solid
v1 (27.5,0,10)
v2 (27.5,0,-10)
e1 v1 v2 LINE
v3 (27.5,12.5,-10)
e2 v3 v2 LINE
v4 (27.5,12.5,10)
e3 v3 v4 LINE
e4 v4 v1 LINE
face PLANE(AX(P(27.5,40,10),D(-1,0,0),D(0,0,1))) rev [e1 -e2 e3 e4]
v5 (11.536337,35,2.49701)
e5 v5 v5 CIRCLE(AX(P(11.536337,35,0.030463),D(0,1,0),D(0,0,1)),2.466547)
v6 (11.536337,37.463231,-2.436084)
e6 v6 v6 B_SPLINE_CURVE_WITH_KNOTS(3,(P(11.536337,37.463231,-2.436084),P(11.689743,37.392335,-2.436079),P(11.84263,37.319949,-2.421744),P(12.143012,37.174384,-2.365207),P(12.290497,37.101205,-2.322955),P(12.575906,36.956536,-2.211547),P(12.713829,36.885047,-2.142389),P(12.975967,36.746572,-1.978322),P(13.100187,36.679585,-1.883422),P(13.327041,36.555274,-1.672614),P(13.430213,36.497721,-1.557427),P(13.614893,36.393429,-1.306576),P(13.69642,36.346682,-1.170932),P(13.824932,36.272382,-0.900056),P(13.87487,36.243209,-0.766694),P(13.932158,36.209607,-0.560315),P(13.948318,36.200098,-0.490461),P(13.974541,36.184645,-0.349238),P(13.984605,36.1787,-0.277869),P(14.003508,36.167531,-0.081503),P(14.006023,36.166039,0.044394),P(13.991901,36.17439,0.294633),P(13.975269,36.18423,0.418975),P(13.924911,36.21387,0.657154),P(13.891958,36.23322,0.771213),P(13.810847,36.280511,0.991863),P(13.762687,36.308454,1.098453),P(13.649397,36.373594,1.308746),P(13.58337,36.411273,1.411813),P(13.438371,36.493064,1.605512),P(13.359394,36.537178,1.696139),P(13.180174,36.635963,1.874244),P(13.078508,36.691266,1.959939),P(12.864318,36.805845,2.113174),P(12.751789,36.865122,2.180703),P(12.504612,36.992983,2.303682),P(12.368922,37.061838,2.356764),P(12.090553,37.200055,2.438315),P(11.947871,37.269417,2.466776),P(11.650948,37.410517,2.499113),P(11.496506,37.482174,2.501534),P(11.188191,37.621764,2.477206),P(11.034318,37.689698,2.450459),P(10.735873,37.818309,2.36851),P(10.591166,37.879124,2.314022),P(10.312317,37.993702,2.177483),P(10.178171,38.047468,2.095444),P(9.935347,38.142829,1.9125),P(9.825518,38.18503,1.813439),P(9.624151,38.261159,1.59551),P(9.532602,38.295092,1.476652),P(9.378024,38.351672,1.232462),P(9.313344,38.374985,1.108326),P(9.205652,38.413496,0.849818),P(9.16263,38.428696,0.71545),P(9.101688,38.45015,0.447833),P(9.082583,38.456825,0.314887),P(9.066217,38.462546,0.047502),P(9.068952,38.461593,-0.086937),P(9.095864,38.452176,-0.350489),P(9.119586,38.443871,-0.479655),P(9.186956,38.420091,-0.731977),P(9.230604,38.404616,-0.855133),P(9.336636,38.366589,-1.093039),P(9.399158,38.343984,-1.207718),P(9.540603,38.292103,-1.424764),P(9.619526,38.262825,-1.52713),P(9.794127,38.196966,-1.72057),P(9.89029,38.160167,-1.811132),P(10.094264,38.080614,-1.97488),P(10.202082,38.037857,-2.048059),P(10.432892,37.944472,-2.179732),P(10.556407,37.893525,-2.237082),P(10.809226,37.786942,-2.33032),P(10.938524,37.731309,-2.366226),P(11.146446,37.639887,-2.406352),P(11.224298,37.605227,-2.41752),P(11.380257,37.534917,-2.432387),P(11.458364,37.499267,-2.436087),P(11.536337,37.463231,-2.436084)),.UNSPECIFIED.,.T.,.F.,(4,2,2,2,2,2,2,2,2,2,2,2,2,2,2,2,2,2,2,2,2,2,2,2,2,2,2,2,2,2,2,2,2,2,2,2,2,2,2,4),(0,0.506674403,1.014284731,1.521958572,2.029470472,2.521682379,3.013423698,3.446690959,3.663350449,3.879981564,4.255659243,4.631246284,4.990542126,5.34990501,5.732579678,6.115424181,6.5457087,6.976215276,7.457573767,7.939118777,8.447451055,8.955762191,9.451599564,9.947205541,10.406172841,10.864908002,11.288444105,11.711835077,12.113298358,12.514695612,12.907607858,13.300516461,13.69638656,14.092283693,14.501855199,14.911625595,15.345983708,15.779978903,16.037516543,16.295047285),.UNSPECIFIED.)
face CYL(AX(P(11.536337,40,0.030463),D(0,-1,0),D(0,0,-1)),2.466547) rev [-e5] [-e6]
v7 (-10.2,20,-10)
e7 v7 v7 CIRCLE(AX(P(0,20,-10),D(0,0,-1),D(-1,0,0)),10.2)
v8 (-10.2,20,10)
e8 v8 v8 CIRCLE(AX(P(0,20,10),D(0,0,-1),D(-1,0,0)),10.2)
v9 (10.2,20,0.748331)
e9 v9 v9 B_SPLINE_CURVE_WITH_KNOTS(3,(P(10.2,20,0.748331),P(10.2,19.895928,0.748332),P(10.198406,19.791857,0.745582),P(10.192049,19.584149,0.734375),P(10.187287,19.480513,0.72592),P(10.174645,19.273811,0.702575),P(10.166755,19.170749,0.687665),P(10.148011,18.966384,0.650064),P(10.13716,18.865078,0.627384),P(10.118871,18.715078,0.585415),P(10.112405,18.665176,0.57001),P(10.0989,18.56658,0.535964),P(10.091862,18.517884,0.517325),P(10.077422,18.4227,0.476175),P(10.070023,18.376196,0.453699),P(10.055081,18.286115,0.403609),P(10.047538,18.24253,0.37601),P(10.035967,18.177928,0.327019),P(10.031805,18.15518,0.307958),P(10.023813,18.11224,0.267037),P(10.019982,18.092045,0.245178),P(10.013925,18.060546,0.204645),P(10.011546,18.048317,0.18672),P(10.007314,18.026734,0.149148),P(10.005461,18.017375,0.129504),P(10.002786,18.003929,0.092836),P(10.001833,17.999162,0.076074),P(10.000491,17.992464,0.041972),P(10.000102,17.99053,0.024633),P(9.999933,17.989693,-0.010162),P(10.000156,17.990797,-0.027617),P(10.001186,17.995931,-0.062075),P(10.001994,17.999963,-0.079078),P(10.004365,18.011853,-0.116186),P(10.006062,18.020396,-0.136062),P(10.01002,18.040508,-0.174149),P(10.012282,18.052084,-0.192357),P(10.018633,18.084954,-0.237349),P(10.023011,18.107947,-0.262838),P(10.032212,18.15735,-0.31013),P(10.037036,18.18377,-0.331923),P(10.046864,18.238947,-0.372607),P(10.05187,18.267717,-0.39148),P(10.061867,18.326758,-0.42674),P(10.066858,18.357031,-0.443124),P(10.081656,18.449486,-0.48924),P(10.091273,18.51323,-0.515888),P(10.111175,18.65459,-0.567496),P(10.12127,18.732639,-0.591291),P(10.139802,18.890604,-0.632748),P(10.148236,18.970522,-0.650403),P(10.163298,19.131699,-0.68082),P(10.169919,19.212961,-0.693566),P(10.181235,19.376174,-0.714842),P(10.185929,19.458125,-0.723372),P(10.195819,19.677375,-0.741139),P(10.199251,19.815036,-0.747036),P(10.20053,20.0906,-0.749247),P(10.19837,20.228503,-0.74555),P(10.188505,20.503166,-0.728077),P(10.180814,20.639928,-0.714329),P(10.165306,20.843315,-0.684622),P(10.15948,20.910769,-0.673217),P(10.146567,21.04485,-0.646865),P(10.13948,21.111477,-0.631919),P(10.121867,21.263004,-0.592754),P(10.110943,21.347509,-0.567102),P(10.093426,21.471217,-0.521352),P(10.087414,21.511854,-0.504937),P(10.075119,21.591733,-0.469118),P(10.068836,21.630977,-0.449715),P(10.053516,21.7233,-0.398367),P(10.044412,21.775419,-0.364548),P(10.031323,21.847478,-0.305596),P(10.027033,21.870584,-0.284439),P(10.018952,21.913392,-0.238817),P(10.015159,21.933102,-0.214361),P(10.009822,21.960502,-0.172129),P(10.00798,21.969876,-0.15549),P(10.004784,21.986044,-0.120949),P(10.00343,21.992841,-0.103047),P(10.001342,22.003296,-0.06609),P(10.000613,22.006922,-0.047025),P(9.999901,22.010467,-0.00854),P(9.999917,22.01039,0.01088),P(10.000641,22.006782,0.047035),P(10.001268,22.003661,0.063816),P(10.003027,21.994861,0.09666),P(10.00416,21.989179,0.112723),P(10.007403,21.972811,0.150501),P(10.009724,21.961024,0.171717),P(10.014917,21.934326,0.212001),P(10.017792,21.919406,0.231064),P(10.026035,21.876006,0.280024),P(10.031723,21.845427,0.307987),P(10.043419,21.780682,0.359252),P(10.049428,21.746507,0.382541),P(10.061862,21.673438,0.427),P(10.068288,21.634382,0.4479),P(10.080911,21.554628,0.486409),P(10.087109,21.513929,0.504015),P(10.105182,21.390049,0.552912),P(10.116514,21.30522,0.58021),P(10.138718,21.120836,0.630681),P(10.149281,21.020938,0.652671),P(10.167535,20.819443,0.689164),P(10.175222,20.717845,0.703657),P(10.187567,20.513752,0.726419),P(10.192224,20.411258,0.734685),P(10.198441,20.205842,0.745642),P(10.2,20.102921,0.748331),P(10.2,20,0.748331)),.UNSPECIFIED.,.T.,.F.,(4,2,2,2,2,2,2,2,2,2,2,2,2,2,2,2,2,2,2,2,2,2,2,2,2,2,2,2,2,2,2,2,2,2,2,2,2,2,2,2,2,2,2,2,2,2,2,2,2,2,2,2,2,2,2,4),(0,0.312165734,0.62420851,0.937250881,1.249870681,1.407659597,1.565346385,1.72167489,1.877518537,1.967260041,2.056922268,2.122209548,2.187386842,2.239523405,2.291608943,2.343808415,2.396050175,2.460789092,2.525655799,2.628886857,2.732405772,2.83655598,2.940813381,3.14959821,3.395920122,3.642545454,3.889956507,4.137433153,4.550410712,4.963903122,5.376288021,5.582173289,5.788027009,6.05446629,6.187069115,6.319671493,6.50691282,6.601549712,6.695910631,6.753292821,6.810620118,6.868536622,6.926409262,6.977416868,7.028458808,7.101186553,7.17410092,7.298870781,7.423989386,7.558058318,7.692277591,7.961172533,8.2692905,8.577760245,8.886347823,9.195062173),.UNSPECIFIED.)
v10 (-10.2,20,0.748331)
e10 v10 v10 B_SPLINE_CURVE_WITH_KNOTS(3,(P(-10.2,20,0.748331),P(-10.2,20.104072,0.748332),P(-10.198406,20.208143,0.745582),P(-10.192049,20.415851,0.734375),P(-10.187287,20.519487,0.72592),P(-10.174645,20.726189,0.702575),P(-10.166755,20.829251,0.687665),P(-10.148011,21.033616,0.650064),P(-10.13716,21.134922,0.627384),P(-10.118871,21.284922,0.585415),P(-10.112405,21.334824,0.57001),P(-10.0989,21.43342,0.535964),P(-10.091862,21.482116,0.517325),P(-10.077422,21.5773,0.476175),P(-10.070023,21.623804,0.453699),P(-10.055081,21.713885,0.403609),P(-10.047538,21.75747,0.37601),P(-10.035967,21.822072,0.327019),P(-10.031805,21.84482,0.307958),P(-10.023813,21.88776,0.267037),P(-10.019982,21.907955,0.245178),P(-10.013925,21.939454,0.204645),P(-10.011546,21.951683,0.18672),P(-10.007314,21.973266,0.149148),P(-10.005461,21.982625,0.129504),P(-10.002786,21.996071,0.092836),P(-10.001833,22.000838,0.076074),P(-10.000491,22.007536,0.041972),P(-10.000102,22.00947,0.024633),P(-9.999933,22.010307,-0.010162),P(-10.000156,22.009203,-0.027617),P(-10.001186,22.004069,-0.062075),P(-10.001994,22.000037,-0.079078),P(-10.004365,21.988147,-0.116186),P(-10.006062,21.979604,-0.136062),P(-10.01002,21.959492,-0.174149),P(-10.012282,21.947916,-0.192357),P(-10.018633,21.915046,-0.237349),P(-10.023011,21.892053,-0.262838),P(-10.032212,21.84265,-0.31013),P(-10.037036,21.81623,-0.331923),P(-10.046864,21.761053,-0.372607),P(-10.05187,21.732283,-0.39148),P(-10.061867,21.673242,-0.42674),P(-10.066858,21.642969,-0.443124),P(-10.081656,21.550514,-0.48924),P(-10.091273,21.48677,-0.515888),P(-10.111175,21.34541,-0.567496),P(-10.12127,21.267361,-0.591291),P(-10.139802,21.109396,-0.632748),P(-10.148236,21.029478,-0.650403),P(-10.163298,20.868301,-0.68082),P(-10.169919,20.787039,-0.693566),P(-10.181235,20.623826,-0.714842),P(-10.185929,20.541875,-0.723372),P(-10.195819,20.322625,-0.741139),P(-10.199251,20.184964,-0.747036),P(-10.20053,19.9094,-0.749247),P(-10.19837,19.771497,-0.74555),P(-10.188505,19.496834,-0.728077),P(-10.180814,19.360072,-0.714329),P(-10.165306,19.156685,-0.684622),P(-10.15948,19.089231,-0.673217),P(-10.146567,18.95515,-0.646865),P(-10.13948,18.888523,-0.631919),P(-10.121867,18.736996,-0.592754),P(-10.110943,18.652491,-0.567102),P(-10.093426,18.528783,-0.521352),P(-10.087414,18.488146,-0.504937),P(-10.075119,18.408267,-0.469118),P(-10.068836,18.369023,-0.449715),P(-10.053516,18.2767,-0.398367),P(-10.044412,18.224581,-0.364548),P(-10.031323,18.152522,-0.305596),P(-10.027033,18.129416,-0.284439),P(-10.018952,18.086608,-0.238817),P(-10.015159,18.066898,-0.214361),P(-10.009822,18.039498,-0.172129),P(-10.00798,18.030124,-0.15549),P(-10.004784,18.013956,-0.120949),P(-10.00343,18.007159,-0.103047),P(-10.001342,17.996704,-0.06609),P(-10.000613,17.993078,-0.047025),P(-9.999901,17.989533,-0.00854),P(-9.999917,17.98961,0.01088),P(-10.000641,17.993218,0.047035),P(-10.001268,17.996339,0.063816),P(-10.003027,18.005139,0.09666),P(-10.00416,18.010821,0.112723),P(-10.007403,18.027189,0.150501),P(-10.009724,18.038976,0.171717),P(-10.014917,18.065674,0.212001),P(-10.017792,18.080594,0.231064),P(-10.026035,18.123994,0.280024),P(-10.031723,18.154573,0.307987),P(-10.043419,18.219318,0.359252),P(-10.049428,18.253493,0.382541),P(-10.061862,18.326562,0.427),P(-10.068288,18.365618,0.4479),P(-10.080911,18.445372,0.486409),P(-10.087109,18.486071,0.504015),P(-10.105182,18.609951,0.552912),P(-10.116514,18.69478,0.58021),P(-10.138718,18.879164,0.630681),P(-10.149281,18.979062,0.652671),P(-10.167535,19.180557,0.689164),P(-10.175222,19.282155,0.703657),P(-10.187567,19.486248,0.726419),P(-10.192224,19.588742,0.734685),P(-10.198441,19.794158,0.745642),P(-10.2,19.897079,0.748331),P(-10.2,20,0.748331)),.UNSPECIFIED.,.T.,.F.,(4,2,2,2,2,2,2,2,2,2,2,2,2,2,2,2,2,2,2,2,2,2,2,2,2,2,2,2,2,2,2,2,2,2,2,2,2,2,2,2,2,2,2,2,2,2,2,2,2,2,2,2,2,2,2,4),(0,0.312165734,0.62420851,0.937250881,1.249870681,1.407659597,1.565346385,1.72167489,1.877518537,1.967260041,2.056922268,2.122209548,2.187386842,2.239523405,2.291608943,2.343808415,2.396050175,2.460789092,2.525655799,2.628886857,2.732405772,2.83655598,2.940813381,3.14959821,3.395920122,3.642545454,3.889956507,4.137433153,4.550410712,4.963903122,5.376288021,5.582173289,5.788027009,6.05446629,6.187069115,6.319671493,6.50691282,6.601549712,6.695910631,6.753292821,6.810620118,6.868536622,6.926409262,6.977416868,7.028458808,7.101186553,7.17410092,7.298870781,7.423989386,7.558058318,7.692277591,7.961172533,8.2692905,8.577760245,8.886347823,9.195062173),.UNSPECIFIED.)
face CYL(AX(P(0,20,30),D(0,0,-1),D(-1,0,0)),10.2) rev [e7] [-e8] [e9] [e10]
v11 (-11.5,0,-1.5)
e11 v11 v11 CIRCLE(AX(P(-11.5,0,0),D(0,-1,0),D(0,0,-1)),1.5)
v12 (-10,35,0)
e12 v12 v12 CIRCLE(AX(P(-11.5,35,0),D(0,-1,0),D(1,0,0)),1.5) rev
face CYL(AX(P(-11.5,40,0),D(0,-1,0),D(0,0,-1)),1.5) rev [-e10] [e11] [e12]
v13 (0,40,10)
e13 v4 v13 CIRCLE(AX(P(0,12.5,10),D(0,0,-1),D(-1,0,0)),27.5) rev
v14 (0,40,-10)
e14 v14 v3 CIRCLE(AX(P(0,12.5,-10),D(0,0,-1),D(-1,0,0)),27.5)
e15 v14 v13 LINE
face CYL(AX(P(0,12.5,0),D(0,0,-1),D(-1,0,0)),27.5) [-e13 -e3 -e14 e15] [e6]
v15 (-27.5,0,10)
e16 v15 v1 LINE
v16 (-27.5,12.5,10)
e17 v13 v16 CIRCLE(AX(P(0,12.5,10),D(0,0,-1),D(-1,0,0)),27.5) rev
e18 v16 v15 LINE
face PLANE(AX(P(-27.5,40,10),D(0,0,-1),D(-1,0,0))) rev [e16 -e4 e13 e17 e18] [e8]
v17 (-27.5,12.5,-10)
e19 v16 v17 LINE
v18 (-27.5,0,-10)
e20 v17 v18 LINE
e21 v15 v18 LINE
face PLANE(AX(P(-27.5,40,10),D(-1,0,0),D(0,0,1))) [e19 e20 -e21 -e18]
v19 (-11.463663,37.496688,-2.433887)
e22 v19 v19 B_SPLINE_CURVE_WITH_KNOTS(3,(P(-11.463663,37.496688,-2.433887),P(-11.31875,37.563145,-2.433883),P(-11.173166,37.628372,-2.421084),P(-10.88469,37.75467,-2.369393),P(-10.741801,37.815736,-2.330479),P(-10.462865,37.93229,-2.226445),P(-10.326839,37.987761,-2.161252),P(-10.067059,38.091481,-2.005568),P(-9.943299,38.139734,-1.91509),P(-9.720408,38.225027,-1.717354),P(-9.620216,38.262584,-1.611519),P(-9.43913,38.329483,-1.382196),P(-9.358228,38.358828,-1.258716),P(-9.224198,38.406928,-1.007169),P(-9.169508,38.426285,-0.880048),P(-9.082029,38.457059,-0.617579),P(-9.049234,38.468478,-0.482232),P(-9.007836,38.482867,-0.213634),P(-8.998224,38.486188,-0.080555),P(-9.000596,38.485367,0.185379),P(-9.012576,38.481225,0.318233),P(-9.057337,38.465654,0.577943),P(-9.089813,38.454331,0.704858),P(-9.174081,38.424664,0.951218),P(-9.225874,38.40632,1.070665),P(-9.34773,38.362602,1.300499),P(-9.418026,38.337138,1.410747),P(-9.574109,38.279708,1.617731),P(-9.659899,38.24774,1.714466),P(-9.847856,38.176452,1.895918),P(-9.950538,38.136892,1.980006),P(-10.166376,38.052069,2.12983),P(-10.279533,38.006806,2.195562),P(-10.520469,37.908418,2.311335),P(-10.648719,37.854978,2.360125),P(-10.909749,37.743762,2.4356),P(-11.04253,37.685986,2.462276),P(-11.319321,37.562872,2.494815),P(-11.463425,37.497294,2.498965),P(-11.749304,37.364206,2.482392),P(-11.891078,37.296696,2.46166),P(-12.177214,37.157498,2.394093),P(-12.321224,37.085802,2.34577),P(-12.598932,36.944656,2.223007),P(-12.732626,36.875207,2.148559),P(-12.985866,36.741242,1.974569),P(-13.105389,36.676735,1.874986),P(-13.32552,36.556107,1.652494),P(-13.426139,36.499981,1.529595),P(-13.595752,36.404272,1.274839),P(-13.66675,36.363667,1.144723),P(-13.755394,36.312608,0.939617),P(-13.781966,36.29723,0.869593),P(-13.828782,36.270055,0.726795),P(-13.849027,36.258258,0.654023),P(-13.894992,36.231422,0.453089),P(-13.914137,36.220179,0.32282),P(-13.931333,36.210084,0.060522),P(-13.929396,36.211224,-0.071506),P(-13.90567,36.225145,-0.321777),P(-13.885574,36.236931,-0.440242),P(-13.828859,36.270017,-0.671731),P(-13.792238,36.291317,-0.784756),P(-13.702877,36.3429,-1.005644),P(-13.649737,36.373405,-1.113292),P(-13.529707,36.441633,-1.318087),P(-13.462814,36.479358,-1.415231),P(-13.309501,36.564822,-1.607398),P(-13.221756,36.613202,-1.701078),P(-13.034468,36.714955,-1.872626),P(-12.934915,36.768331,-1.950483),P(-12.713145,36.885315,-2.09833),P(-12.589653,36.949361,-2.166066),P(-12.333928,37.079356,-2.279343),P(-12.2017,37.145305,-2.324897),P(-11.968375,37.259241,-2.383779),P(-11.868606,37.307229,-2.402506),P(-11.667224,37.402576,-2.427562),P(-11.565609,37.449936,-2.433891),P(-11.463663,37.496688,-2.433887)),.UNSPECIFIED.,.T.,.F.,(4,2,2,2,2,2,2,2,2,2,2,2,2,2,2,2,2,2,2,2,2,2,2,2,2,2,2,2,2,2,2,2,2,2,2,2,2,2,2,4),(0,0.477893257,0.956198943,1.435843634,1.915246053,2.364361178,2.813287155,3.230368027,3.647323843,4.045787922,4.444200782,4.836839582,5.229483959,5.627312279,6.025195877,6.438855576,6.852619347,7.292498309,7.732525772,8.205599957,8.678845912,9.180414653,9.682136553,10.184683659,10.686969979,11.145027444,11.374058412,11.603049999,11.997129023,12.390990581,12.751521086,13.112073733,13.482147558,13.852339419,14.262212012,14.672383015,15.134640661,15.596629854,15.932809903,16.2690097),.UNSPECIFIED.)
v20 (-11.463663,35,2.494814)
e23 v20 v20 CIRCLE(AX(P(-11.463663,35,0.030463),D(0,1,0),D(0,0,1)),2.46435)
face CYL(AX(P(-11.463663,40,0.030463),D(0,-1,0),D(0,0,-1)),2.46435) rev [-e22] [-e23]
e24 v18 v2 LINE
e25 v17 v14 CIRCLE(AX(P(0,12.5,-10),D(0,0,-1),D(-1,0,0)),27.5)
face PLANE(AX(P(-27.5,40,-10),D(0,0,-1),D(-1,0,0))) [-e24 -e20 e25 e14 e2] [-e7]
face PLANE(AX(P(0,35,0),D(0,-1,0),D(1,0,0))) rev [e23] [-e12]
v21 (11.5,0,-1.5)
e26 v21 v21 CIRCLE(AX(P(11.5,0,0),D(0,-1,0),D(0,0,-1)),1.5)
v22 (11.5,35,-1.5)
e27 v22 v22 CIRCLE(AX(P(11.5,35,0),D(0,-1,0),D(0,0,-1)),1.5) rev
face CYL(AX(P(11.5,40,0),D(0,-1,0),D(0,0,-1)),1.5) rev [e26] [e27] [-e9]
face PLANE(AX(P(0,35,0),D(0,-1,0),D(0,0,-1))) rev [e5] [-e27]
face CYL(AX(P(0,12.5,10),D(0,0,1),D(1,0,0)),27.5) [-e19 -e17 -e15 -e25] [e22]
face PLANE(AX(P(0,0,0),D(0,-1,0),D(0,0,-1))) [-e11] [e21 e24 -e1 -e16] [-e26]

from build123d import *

# Parameters (mm, degrees)
SKETCH1_W              = 55
SKETCH1_H              = 20
BOSS_EXTRUDE2_DEPTH    = 40
FILLET3_R              = 27.5
SKETCH3_R              = 10.2
CUT_EXTRUDE1_DEPTH     = 40
SKETCH4_R              = 1.5
CUT_EXTRUDE2_DEPTH     = 40
CUT_EXTRUDE3_OUTLINE_W = 1.013964341
CUT_EXTRUDE3_OUTLINE_H = 3.461369181
CUT_EXTRUDE4_OUTLINE_W = 1.011767624
CUT_EXTRUDE4_OUTLINE_H = 3.485879142


# Read off the part's stored shape, not the designer's step: Cut-Extrude3, Cut-Extrude4
with BuildPart() as part:
    # Sketch1 → Boss-Extrude2 (new body)
    with BuildSketch(Plane(origin=(0, 0, 0), x_dir=(1, 0, 0), z_dir=(0, 1, 0))):
        Rectangle(SKETCH1_W, SKETCH1_H)
    extrude(amount=BOSS_EXTRUDE2_DEPTH)

    # Fillet3
    fillet3_edges = [part.edges().sort_by_distance(p)[0] for p in [
        (27.5, 40, 0),
        (-27.5, 40, 0),
    ]]
    fillet(fillet3_edges, radius=FILLET3_R - 0.0001)  # a hair under: the kernel refuses the full size

    # Sketch3 → Cut-Extrude1 (cut)
    with BuildSketch(Plane(origin=(0, 0, -10), x_dir=(-1, 0, 0), z_dir=(0, 0, -1))):
        with Locations((0, 20)):
            Circle(SKETCH3_R)
    extrude(amount=-CUT_EXTRUDE1_DEPTH, mode=Mode.SUBTRACT)

    # Sketch4 → Cut-Extrude2 (cut)
    with BuildSketch(Plane.XZ):
        with Locations(Location((-11.5, 0, 0), (0, 0, 270))):
            Circle(SKETCH4_R)
        with Locations(Location((11.5, 0, 0), (0, 0, 270))):
            Circle(SKETCH4_R)
    extrude(amount=-CUT_EXTRUDE2_DEPTH, mode=Mode.SUBTRACT)

    # Cut-Extrude3 outline → Cut-Extrude3 (revolve, cut)
    with BuildSketch(Plane(origin=(11.536337156, 0, 0.030463059), x_dir=(1, 0, 0), z_dir=(0, 0, 1))):
        with Locations((1.959565013, 36.730684591)):
            Rectangle(CUT_EXTRUDE3_OUTLINE_W, CUT_EXTRUDE3_OUTLINE_H)
    revolve(axis=Axis((11.536337156, 0, 0.030463059), (0, 1, 0)), mode=Mode.SUBTRACT)

    # Cut-Extrude4 outline → Cut-Extrude4 (revolve, cut)
    with BuildSketch(Plane(origin=(-11.463662844, 0, 0.030463059), x_dir=(1, 0, 0), z_dir=(0, 0, 1))):
        with Locations((1.958466654, 36.742939571)):
            Rectangle(CUT_EXTRUDE4_OUTLINE_W, CUT_EXTRUDE4_OUTLINE_H)
    revolve(axis=Axis((-11.463662844, 0, 0.030463059), (0, 1, 0)), mode=Mode.SUBTRACT)


solid = part.part
